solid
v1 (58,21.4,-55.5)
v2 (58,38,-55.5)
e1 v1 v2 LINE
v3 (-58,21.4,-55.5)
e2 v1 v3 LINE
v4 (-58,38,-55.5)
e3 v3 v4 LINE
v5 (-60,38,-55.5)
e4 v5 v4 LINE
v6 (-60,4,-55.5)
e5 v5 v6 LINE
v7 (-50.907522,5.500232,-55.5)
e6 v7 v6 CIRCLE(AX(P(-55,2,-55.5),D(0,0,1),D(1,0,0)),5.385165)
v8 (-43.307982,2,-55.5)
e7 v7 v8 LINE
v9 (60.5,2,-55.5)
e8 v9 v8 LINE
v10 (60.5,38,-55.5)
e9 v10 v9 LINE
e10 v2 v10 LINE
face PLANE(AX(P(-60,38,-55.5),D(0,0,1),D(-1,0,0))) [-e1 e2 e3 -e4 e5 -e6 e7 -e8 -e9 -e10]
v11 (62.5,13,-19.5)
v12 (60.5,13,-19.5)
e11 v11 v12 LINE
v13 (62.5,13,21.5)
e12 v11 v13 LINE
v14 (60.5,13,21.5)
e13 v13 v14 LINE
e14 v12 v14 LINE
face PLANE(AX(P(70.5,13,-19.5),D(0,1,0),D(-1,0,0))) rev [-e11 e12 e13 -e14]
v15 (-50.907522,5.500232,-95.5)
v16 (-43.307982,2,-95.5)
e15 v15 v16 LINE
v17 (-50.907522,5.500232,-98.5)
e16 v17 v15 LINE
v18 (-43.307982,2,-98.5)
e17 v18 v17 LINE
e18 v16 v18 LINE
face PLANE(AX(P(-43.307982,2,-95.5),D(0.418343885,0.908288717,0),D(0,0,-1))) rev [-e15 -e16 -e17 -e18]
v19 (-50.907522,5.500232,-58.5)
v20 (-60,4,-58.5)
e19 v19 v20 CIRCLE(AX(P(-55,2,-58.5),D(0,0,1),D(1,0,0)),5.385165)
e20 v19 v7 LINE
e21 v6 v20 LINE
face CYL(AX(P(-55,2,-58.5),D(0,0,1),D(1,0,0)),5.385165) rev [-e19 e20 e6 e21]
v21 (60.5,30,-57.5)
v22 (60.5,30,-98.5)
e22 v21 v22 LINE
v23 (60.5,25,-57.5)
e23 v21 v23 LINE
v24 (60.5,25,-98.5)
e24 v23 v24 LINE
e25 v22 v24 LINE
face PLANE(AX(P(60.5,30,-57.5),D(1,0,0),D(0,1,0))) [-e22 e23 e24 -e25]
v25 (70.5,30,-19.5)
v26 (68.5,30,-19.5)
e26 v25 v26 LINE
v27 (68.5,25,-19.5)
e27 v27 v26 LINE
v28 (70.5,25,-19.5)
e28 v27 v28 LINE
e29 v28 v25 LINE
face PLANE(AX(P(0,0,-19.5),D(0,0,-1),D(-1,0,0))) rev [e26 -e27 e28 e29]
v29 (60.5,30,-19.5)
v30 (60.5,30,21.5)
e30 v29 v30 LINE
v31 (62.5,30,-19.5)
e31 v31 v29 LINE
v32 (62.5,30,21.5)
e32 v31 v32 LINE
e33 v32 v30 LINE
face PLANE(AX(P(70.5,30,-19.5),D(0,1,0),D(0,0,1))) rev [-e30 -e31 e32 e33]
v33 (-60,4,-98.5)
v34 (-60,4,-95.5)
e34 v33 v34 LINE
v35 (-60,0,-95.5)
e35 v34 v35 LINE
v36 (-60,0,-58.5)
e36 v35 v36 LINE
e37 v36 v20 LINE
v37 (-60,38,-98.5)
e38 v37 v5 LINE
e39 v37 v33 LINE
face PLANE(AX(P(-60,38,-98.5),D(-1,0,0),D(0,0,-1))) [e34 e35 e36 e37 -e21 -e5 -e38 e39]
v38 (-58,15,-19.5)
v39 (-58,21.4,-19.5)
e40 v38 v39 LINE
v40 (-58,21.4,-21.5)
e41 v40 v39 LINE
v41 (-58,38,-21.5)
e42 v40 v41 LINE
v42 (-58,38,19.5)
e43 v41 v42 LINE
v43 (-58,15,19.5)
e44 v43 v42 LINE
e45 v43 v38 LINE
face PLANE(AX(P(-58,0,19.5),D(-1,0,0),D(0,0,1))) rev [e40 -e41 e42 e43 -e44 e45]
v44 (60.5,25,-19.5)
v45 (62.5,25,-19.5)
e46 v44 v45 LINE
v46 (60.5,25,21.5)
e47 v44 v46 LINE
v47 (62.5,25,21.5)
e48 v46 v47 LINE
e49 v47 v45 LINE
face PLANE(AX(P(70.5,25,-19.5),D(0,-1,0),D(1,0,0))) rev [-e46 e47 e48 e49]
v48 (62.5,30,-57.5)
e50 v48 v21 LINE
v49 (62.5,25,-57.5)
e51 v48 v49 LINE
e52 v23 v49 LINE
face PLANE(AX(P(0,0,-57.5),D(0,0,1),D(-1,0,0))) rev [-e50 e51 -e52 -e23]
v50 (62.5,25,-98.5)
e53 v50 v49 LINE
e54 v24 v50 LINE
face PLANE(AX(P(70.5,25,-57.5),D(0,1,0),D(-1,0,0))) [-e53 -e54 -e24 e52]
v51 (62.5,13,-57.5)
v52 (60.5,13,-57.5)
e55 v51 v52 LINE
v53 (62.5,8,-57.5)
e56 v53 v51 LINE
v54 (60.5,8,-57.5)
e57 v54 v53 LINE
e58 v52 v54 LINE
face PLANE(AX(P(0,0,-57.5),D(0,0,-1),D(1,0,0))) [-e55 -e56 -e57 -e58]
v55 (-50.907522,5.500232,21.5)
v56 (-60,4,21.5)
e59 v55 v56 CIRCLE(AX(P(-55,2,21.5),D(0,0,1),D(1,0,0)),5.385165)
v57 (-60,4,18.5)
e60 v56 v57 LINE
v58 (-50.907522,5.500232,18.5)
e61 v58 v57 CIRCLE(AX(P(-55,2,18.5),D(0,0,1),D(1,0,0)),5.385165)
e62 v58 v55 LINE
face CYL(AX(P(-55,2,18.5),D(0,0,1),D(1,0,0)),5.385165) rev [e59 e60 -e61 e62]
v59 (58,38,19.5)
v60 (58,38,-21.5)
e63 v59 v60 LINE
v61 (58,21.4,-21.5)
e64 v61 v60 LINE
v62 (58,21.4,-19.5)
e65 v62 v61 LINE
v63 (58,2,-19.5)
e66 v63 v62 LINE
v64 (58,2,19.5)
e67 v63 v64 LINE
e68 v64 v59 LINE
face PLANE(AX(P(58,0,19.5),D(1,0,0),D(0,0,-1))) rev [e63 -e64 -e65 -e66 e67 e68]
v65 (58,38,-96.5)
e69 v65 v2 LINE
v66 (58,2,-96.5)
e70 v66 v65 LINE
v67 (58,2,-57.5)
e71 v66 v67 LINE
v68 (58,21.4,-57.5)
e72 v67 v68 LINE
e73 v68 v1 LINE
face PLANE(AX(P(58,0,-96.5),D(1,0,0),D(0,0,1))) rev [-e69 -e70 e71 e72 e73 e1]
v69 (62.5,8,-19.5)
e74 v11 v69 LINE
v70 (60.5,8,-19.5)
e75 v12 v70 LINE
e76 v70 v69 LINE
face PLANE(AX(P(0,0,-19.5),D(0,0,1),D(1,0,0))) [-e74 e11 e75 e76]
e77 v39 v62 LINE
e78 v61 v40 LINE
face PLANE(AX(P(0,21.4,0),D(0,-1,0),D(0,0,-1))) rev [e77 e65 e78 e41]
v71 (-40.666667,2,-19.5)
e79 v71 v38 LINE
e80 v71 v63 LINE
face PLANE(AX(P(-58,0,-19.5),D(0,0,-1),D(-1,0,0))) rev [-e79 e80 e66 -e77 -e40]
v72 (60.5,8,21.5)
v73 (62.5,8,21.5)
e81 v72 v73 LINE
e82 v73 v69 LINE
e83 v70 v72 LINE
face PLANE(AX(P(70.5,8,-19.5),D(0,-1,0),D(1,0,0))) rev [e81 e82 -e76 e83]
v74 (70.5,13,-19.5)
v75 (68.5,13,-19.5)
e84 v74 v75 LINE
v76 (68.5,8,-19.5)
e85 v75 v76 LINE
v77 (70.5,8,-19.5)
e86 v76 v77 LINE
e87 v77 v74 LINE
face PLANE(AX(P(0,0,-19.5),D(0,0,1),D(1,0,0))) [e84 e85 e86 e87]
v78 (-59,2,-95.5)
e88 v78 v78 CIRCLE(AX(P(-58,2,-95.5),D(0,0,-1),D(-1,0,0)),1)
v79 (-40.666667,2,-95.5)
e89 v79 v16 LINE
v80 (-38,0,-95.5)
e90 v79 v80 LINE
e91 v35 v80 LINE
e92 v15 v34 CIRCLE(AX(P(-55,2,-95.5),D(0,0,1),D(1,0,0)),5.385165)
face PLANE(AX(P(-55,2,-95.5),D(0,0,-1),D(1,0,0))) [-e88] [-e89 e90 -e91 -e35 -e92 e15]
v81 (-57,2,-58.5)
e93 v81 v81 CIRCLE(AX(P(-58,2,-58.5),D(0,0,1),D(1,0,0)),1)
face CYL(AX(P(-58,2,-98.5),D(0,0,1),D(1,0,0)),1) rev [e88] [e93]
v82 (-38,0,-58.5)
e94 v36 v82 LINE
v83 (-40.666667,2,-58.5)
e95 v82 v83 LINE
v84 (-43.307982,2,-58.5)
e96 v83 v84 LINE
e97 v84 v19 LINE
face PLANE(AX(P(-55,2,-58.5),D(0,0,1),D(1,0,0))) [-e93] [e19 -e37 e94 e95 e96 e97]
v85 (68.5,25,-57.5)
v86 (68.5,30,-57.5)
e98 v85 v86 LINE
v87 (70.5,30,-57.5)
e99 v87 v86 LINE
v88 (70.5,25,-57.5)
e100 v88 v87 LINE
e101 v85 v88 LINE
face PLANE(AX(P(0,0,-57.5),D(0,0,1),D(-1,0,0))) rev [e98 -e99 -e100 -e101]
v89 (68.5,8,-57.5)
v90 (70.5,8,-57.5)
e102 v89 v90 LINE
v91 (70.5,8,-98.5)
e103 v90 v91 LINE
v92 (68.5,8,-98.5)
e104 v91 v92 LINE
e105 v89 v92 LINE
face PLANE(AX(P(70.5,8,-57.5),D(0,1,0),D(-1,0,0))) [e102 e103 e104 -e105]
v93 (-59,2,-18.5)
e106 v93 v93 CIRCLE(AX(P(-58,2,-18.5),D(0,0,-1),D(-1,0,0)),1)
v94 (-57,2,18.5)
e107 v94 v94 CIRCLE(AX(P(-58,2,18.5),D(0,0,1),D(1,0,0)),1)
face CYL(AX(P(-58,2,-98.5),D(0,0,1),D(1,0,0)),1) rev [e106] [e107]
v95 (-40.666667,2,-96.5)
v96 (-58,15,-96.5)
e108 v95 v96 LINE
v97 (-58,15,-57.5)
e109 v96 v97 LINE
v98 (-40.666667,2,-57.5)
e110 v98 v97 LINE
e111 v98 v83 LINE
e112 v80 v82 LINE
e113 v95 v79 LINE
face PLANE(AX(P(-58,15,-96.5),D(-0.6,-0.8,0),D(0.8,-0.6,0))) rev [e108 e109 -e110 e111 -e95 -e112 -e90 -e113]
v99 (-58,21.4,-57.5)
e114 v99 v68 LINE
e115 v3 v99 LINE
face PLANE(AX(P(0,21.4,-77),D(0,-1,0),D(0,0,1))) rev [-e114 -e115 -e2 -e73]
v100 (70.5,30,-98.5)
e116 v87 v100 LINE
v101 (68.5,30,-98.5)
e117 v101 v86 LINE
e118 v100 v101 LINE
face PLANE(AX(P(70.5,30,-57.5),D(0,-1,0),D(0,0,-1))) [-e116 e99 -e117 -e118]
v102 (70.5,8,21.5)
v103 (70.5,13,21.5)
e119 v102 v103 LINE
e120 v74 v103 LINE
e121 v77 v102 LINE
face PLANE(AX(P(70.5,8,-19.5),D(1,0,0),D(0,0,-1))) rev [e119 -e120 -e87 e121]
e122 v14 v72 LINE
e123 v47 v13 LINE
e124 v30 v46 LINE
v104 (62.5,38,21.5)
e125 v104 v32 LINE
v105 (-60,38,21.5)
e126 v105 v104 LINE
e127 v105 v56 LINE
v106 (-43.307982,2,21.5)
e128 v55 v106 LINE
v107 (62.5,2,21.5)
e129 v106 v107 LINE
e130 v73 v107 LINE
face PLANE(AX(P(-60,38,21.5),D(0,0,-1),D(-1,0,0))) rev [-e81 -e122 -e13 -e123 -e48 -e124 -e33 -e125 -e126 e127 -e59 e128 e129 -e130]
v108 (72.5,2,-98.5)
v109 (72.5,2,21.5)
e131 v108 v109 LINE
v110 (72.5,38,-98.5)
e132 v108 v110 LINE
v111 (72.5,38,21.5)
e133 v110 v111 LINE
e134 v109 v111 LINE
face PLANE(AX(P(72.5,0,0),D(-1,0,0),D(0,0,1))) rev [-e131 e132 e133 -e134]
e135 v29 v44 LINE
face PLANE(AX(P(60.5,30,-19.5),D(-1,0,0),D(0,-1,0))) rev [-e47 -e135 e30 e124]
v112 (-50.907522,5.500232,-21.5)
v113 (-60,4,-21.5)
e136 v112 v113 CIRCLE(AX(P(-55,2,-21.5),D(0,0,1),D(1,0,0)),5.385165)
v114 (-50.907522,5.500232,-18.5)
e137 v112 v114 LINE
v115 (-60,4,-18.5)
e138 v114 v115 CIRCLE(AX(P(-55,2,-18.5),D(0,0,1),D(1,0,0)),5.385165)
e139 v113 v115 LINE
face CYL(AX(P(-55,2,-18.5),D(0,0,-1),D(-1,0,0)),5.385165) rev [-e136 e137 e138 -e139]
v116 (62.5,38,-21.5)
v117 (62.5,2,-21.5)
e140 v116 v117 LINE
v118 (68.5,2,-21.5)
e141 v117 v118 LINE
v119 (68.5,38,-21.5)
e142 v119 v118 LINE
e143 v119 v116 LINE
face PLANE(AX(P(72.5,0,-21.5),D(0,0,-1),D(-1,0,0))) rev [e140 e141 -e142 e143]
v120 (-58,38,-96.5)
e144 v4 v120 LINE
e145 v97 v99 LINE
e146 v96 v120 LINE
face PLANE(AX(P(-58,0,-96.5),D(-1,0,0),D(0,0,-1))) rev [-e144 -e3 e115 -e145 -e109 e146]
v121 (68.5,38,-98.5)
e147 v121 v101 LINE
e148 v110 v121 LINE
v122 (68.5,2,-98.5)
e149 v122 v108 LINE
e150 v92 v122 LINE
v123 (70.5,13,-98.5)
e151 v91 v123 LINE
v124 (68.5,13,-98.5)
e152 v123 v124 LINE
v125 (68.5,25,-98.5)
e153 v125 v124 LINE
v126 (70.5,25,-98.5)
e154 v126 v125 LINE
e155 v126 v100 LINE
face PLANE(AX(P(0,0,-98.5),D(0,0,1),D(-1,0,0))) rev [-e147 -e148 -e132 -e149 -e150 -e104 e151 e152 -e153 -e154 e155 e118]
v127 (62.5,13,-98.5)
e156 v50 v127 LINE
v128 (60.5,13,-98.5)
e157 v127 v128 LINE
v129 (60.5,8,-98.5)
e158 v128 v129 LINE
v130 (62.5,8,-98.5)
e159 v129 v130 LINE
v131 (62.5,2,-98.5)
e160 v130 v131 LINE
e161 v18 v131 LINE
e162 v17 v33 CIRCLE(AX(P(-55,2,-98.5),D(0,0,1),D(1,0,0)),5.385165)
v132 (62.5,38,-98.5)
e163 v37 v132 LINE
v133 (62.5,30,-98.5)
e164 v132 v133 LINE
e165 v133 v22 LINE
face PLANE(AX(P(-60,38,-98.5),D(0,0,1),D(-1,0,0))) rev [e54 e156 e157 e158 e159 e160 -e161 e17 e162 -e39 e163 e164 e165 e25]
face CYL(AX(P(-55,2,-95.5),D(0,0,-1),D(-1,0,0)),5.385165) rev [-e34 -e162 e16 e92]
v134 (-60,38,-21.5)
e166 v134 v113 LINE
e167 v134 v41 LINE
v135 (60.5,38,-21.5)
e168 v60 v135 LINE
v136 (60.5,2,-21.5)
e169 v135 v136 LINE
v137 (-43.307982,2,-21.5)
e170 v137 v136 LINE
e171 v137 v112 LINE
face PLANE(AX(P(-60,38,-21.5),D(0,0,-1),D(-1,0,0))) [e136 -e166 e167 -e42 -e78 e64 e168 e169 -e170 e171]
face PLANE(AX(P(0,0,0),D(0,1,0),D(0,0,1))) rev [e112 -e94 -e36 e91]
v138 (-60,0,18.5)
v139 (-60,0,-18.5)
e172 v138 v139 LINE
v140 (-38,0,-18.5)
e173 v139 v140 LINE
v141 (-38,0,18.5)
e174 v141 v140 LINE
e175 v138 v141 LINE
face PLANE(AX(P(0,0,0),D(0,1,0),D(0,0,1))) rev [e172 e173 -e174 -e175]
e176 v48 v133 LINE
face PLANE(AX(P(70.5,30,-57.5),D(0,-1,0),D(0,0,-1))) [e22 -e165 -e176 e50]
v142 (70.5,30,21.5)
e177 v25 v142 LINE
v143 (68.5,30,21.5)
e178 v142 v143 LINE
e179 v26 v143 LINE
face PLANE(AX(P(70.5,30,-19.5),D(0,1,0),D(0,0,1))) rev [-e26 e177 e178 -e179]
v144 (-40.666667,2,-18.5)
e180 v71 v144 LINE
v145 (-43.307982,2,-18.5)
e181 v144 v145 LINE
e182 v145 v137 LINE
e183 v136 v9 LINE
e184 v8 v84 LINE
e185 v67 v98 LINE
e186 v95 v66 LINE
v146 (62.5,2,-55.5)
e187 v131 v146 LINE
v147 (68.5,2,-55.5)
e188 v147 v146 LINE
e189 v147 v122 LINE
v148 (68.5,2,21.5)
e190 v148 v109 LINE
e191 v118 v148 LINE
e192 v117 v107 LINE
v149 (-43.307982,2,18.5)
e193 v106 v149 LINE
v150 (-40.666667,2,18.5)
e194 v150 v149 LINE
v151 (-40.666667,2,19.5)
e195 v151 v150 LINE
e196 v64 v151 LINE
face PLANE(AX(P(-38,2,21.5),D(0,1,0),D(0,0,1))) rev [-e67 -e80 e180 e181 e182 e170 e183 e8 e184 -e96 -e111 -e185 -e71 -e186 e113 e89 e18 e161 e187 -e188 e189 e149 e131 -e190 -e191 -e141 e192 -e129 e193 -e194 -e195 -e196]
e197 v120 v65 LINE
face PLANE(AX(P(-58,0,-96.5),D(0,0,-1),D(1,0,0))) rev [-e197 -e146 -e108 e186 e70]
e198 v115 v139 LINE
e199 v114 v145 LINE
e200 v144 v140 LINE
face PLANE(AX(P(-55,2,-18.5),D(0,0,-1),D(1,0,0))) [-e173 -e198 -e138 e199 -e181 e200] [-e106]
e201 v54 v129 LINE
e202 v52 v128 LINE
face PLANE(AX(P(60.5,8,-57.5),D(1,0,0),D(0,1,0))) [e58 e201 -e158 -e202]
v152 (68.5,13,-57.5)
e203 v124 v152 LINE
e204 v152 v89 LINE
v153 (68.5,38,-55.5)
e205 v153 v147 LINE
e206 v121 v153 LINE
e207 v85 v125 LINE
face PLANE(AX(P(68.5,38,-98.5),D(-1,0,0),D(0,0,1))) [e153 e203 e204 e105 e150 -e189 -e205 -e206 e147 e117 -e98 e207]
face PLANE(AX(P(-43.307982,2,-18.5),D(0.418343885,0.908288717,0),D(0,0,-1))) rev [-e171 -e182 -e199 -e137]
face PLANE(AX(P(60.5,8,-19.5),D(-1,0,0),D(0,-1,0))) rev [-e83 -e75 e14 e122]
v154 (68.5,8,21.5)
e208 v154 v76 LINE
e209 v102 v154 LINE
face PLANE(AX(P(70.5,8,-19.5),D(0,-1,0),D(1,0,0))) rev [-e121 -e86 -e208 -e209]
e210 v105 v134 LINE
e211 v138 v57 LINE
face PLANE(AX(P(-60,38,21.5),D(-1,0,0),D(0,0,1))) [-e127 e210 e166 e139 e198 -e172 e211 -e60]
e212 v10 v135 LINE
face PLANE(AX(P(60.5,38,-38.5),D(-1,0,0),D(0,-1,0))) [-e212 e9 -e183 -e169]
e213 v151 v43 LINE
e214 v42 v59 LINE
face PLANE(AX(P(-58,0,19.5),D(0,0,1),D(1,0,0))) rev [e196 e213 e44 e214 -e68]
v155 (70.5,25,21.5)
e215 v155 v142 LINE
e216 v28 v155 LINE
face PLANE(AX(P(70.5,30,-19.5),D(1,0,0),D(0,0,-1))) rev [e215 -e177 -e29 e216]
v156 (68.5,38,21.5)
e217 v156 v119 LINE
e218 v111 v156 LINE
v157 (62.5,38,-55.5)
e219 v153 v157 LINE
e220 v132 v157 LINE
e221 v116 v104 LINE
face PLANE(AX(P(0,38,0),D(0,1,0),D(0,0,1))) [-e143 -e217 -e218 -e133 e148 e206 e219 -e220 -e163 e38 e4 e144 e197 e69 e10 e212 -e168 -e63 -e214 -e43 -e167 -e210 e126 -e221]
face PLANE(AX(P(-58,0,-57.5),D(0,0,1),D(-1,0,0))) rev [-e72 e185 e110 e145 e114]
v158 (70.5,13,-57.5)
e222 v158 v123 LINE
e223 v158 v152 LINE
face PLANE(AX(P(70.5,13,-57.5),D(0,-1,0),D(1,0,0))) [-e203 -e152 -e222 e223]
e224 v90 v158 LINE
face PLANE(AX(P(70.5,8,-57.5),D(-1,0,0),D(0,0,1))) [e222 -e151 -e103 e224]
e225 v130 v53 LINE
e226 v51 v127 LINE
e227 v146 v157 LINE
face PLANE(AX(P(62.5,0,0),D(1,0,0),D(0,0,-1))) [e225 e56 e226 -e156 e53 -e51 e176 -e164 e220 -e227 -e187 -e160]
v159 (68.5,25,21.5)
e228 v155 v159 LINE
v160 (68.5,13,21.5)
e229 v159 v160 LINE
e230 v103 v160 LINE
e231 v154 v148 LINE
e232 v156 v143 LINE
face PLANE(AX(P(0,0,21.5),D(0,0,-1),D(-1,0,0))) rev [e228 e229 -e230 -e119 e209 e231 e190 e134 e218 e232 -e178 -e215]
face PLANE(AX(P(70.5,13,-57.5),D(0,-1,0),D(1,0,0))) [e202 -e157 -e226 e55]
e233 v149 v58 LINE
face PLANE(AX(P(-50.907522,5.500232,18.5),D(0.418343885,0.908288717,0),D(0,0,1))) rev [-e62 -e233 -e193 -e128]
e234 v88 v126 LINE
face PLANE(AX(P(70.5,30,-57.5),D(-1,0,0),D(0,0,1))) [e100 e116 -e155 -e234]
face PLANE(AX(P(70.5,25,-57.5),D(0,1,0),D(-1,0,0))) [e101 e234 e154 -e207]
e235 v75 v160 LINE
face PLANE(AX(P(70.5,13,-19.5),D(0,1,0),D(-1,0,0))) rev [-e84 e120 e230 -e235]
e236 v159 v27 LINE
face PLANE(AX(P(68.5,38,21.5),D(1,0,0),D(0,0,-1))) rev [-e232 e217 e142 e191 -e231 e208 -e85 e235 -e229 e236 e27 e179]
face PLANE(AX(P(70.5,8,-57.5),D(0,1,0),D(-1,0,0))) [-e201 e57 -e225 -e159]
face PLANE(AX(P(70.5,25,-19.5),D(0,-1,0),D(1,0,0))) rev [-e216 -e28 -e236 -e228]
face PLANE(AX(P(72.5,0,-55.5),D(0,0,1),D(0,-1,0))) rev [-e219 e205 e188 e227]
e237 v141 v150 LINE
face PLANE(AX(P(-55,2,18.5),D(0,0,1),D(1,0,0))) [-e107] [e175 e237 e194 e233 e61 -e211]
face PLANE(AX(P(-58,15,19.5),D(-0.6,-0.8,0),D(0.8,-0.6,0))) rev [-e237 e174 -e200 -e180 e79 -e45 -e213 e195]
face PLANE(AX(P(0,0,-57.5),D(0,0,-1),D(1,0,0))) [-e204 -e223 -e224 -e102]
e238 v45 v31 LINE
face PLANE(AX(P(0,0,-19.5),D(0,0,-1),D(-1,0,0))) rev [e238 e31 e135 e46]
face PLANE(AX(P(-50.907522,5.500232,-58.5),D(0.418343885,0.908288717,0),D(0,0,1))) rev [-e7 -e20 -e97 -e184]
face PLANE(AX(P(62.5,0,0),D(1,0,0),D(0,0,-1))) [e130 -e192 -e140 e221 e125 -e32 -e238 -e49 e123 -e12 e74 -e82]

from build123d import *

# Parameters (mm, degrees)
SKETCH2_W            = 120
SKETCH2_H            = 43
BOSS_EXTRUDE1_DEPTH  = 38
SKETCH3_W            = 116
SKETCH3_H            = 39
CUT_EXTRUDE1_DEPTH   = 38
BOSS_EXTRUDE2_DEPTH  = 39
SKETCH5_W            = 43
SKETCH5_H            = 38
BOSS_EXTRUDE3_DEPTH  = 2.5
SKETCH6_W            = 2
SKETCH6_H            = 38
BOSS_EXTRUDE4_DEPTH  = 17
SKETCH7_W            = 34
SKETCH7_H            = 38
BOSS_EXTRUDE5_DEPTH  = 10
SKETCH8_W            = 4
SKETCH8_H            = 38
BOSS_EXTRUDE6_DEPTH  = 43
SKETCH9_W            = 10
SKETCH9_H            = 5
CUT_EXTRUDE2_DEPTH   = 41
SKETCH11_W           = 120
SKETCH11_H           = 2
CUT_EXTRUDE3_DEPTH   = 110.5
CUT_EXTRUDE4_DEPTH   = 3
MIRROR4_COPY_1_DEPTH = 3
CUT_EXTRUDE5_START   = -114
SKETCH13_R           = 1
CUT_EXTRUDE5_DEPTH   = 114
SKETCH14_W           = 116
SKETCH14_H           = 2
CUT_EXTRUDE6_DEPTH   = 16.6


with BuildPart() as part:
    # Sketch2 → Boss-Extrude1 (new body)
    with BuildSketch(Plane(origin=(0, 0, 0), x_dir=(1, 0, 0), z_dir=(0, 1, 0))):
        Rectangle(SKETCH2_W, SKETCH2_H)
    extrude(amount=BOSS_EXTRUDE1_DEPTH)

    # Sketch3 → Cut-Extrude1 (cut)
    with BuildSketch(Plane(origin=(0, 38, 0), x_dir=(1, 0, 0), z_dir=(0, 1, 0))):
        Rectangle(SKETCH3_W, SKETCH3_H)
    extrude(amount=-CUT_EXTRUDE1_DEPTH, mode=Mode.SUBTRACT)

    # Sketch4 → Boss-Extrude2 (add)
    with BuildSketch(Plane.XY.offset(-19.5)):
        Polygon((-58, 0), (-58, 15), (-38, 0), align=None)
    extrude(amount=BOSS_EXTRUDE2_DEPTH)

    # Sketch5 → Boss-Extrude3 (add)
    with BuildSketch(Plane(origin=(60, 0, 0), x_dir=(0, 0, -1), z_dir=(1, 0, 0))):
        with Locations((0, 19)):
            Rectangle(SKETCH5_W, SKETCH5_H)
    extrude(amount=BOSS_EXTRUDE3_DEPTH)

    # Sketch6 → Boss-Extrude4 (add)
    with BuildSketch(Plane(origin=(0, 0, -21.5), x_dir=(-1, 0, 0), z_dir=(0, 0, -1))):
        with Locations((-61.5, 19)):
            Rectangle(SKETCH6_W, SKETCH6_H)
    extrude(amount=BOSS_EXTRUDE4_DEPTH)

    # Mirror1: part across plane


with BuildPart() as part_1:
    add(part.part)
    add(part.part.mirror(Plane(origin=(0, 0, -38.5), x_dir=(1, 0, 0), z_dir=(0, 0, -1))))

    # Sketch7 → Boss-Extrude5 (add)
    with BuildSketch(Plane(origin=(62.5, 0, 0), x_dir=(0, 0, -1), z_dir=(1, 0, 0))):
        with Locations((38.5, 19)):
            Rectangle(SKETCH7_W, SKETCH7_H)
    extrude(amount=BOSS_EXTRUDE5_DEPTH)

    # Sketch8 → Boss-Extrude6 (add)
    with BuildSketch(Plane.XY.offset(-21.5)):
        with Locations((70.5, 19)):
            Rectangle(SKETCH8_W, SKETCH8_H)
    boss_extrude6 = extrude(amount=BOSS_EXTRUDE6_DEPTH)

    # Sketch9 → Cut-Extrude2 (cut)
    with BuildSketch(Plane.XY.offset(21.5)):
        with Locations((65.5, 27.5)):
            Rectangle(SKETCH9_W, SKETCH9_H)
        with Locations((65.5, 10.5)):
            Rectangle(SKETCH9_W, SKETCH9_H)
    cut_extrude2 = extrude(amount=-CUT_EXTRUDE2_DEPTH, mode=Mode.SUBTRACT)

    # Mirror2: Boss-Extrude6, Cut-Extrude2 across plane
    add(boss_extrude6.mirror(Plane(origin=(0, 0, -38.5), x_dir=(1, 0, 0), z_dir=(0, 0, -1))))
    add(cut_extrude2.mirror(Plane(origin=(0, 0, -38.5), x_dir=(1, 0, 0), z_dir=(0, 0, -1))), mode=Mode.SUBTRACT)

    # Sketch11 → Cut-Extrude3 (cut)
    with BuildSketch(Plane(origin=(72.5, 0, 0), x_dir=(0, 0, -1), z_dir=(1, 0, 0))):
        with Locations((38.5, 1)):
            Rectangle(SKETCH11_W, SKETCH11_H)
    extrude(amount=-CUT_EXTRUDE3_DEPTH, mode=Mode.SUBTRACT)

    # Sketch12 → Cut-Extrude4 (cut)
    with BuildSketch(Plane.XY.offset(21.5)):
        with BuildLine():
            Line((-38, 2), (-49.614835193, 2))
            ThreePointArc((-49.614835193, 2), (-56.018375168, 7.287996976), (-60, 0))
            Line((-60, 0), (-38, 0))
            Line((-38, 0), (-38, 2))
        make_face()
    cut_extrude4 = extrude(amount=-CUT_EXTRUDE4_DEPTH, mode=Mode.SUBTRACT)

    # Mirror3: Cut-Extrude4 across plane
    add(cut_extrude4.mirror(Plane.XY), mode=Mode.SUBTRACT)

    # Mirror4: Cut-Extrude4 across plane
    add(cut_extrude4.mirror(Plane(origin=(0, 0, -38.5), x_dir=(1, 0, 0), z_dir=(0, 0, -1))), mode=Mode.SUBTRACT)

    # Mirror4 copy 1 sketch → Mirror4 copy 1 (cut)
    with BuildSketch(Plane.XY.offset(-55.5)):
        with BuildLine():
            Line((-38, 2), (-49.614835193, 2))
            ThreePointArc((-49.614835193, 2), (-56.018375168, 7.287996976), (-60, 0))
            Line((-60, 0), (-38, 0))
            Line((-38, 0), (-38, 2))
        make_face()
    extrude(amount=-MIRROR4_COPY_1_DEPTH, mode=Mode.SUBTRACT)

    # Sketch13 → Cut-Extrude5 (cut)
    with BuildSketch(Plane.XY.offset(18.5).offset(CUT_EXTRUDE5_START)):
        with Locations((-58, 2)):
            Circle(SKETCH13_R)
    extrude(amount=CUT_EXTRUDE5_DEPTH, mode=Mode.SUBTRACT)

    # Chamfer1
    # the kernel refuses this chamfer: 10 mm, written as the material it takes off along each edge
    with BuildSketch(Plane(origin=(-49.614835193, 2, 38.180669666), x_dir=(-0.41152080336556635, 0.9114003666870882, 0), z_dir=(0, 0, -1))) as chamfer1_piece_1:
        with BuildLine():
            Line((4.024103798, 0), (-2.897424879, 6.010331734))
            Line((-2.897424879, 6.010331734), (-3.079704953, 5.928027573))
            ThreePointArc((-3.079704953, 5.928027573), (-1.554736759, 2.957293148), (-0.182280073, -0.082304161))
            Line((-0.182280073, -0.082304161), (0.082304161, -0.182280073))
            ThreePointArc((0.082304161, -0.182280073), (2.000716354, 0.27264804), (3.968173362, -0.192020276))
            Line((3.968173362, -0.192020276), (4.024103798, 0))
        make_face()
    extrude(amount=19.680669666, mode=Mode.SUBTRACT)

    # Chamfer2
    # the kernel refuses this chamfer: 10 mm, written as the material it takes off along each edge
    with BuildSketch(Plane(origin=(-49.614835193, 2, -38.180669666), x_dir=(0.9996854583228201, -0.0250795617564035, 0), z_dir=(0, 0, 1))) as chamfer2_piece_1:
        with BuildLine():
            Line((6.672267866, 0), (-1.747462586, 3.624884258))
            Line((-1.747462586, 3.624884258), (-1.896145364, 3.491117927))
            ThreePointArc((-1.896145364, 3.491117927), (-0.623209418, 1.920628258), (-0.199937092, -0.005015912))
            Line((-0.199937092, -0.005015912), (0.005015912, -0.199937092))
            ThreePointArc((0.005015912, -0.199937092), (3.339051469, -0.116294632), (6.677283779, -0.199937092))
            Line((6.677283779, -0.199937092), (6.672267866, 0))
        make_face()
    extrude(amount=19.680669666, mode=Mode.SUBTRACT)

    # Chamfer3
    # the kernel refuses this chamfer: 10 mm, written as the material it takes off along each edge
    with BuildSketch(Plane(origin=(-49.614835193, 2, -38.819330334), x_dir=(0.9996854583228201, -0.02507956175640344, 0), z_dir=(0, 0, -1))) as chamfer3_piece_1:
        with BuildLine():
            Line((6.672267866, 0), (-1.747462586, -3.624884258))
            Line((-1.747462586, -3.624884258), (-1.896145364, -3.491117927))
            ThreePointArc((-1.896145364, -3.491117927), (-0.623209418, -1.920628258), (-0.199937092, 0.005015912))
            Line((-0.199937092, 0.005015912), (0.005015912, 0.199937092))
            ThreePointArc((0.005015912, 0.199937092), (3.339051469, 0.116294632), (6.677283779, 0.199937092))
            Line((6.677283779, 0.199937092), (6.672267866, 0))
        make_face()
    extrude(amount=19.680669666, mode=Mode.SUBTRACT)

    # Chamfer4
    # the kernel refuses this chamfer: 10 mm, written as the material it takes off along each edge
    with BuildSketch(Plane(origin=(-49.614835193, 2, -115.180669666), x_dir=(0.9996854583228201, -0.0250795617564035, 0), z_dir=(0, 0, 1))) as chamfer4_piece_1:
        with BuildLine():
            Line((6.672267866, 0), (-1.747462586, 3.624884258))
            Line((-1.747462586, 3.624884258), (-1.896145364, 3.491117927))
            ThreePointArc((-1.896145364, 3.491117927), (-0.623209418, 1.920628258), (-0.199937092, -0.005015912))
            Line((-0.199937092, -0.005015912), (0.005015912, -0.199937092))
            ThreePointArc((0.005015912, -0.199937092), (3.339051469, -0.116294632), (6.677283779, -0.199937092))
            Line((6.677283779, -0.199937092), (6.672267866, 0))
        make_face()
    extrude(amount=19.680669666, mode=Mode.SUBTRACT)

    # Sketch14 → Cut-Extrude6 (cut)
    with BuildSketch(Plane(origin=(0, 38, 0), x_dir=(1, 0, 0), z_dir=(0, 1, 0))):
        with Locations((0, 20.5)):
            Rectangle(SKETCH14_W, SKETCH14_H)
    cut_extrude6 = extrude(amount=-CUT_EXTRUDE6_DEPTH, mode=Mode.SUBTRACT)

    # Mirror5: Cut-Extrude6 across plane
    add(cut_extrude6.mirror(Plane(origin=(0, 0, -38.5), x_dir=(1, 0, 0), z_dir=(0, 0, -1))), mode=Mode.SUBTRACT)


solid = part_1.part
